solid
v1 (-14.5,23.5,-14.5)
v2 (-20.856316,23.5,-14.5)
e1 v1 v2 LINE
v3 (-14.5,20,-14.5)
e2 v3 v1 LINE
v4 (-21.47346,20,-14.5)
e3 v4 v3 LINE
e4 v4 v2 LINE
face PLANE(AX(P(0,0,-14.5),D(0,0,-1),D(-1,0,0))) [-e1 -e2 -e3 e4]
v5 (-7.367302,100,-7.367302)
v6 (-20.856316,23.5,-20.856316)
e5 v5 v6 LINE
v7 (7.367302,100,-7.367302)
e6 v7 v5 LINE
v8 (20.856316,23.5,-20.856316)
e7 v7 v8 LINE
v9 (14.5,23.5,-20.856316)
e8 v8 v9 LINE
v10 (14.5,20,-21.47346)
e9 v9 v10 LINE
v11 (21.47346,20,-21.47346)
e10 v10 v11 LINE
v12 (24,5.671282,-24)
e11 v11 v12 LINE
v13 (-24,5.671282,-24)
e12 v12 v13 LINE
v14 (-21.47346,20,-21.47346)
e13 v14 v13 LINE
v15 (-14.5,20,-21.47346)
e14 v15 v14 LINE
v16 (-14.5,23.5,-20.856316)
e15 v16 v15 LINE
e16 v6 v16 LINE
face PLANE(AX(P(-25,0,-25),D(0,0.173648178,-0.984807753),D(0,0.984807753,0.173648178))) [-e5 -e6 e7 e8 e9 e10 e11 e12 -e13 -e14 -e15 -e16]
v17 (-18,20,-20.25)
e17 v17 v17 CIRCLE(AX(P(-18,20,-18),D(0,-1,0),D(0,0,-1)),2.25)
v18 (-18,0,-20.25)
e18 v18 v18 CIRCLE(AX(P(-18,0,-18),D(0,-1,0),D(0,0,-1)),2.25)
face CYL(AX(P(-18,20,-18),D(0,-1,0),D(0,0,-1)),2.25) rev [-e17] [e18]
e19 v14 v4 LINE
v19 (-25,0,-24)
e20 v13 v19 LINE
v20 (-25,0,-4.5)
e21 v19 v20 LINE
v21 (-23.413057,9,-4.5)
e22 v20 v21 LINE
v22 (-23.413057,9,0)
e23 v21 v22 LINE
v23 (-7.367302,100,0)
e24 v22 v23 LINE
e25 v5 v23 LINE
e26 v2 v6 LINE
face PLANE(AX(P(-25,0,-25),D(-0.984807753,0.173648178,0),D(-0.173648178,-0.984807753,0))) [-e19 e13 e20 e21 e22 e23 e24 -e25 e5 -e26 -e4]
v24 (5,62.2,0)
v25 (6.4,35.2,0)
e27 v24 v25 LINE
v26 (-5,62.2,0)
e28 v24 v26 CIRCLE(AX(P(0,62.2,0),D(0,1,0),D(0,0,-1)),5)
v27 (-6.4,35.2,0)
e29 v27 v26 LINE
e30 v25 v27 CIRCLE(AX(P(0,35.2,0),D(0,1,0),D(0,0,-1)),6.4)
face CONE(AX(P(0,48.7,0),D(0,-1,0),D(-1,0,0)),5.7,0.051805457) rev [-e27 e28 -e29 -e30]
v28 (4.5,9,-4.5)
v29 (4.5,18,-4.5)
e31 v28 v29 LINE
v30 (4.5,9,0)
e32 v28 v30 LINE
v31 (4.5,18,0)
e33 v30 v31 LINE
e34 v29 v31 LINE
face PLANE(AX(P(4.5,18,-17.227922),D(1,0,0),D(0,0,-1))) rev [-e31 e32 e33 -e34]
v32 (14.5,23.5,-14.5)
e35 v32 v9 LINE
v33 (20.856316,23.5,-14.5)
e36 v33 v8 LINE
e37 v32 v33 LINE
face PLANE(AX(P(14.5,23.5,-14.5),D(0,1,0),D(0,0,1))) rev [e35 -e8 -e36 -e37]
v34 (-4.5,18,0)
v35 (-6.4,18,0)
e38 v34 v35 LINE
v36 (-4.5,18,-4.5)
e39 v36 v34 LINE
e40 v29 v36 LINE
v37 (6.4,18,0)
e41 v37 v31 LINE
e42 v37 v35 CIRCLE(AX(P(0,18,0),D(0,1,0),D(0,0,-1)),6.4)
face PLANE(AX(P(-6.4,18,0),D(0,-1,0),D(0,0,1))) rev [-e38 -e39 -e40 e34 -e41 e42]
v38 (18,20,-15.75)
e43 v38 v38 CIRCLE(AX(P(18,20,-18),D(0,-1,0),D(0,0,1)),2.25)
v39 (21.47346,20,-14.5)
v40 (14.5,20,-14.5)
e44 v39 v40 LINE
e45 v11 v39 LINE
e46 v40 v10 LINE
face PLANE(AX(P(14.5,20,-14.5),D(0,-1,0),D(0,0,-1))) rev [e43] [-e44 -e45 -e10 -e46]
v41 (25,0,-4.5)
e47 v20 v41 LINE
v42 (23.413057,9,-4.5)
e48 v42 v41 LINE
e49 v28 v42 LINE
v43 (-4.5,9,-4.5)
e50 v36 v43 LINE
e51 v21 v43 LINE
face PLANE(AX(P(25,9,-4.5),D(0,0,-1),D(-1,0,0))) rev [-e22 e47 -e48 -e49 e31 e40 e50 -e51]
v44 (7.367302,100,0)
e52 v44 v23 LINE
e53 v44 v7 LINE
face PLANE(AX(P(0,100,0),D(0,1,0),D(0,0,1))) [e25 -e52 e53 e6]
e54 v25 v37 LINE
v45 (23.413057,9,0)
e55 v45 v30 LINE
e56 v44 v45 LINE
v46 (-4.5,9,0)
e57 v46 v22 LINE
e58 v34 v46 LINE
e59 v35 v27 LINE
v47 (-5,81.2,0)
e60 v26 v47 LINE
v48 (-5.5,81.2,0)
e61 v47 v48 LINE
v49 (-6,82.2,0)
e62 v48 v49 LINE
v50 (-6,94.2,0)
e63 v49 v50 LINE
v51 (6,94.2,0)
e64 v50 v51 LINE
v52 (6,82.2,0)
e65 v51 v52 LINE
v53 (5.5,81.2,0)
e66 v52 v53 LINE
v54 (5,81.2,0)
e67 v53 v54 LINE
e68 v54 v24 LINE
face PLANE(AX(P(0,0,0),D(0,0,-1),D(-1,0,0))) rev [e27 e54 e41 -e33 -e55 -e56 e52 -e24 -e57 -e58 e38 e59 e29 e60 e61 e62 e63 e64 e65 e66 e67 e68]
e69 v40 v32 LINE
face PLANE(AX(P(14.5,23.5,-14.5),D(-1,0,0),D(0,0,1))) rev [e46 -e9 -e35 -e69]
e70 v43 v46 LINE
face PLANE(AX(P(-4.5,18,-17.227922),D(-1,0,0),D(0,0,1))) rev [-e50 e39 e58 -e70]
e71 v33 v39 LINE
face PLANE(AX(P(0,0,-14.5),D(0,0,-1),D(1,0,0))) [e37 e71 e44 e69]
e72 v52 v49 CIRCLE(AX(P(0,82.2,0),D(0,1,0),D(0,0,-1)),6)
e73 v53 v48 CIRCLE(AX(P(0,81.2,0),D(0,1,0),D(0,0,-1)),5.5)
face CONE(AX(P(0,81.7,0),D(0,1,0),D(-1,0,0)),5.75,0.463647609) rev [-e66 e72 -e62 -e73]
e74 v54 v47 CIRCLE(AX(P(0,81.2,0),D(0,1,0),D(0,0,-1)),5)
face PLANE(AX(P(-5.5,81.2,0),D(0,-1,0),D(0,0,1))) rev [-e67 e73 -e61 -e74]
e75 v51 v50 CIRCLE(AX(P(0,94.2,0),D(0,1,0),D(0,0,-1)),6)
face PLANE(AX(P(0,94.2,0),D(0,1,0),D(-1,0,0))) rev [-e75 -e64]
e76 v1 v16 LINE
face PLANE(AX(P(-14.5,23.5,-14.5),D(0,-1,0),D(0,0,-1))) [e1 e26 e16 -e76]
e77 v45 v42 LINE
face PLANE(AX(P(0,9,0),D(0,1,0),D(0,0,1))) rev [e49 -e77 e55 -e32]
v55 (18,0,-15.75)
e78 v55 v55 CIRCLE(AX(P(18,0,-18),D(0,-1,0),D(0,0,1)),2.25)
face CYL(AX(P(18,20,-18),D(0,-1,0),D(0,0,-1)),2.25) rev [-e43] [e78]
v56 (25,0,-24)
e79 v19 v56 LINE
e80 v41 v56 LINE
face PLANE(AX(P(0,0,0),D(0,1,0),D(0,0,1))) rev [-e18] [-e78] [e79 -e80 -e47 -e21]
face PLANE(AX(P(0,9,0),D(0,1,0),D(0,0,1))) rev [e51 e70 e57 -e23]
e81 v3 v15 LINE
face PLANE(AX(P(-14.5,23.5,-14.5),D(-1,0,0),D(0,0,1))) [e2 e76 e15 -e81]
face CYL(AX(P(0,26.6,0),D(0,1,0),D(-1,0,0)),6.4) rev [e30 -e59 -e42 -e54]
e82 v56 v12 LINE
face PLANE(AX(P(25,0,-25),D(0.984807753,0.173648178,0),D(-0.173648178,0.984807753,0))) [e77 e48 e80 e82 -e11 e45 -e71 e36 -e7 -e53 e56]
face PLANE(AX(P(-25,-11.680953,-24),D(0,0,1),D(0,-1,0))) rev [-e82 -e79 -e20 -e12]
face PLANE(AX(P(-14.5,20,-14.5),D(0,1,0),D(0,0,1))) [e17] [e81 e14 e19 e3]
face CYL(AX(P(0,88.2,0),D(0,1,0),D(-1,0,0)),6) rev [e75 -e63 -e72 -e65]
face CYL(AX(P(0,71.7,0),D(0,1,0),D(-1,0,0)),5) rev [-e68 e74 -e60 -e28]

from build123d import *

# Parameters (mm, degrees)
SKETCH_2_W               = 50
SKETCH_2_H               = 50
EXTRUDE_1_DEPTH          = 100
EXTRUDE_1_TAPER          = 10
SKETCH_3_W               = 215.720321278
SKETCH_3_H               = 290.879799434
CUT_EXTRUDE_1_DEPTH      = 107.066017319
SKETCH_7_W               = 4.5
SKETCH_7_H               = 23.792731937
SKETCH_8_W               = 50
SKETCH_8_H               = 4.5
CUT_EXTRUDE_2_DEPTH      = 9
SKETCH_9_W               = 9
SKETCH_9_H               = 9
CUT_EXTRUDE_3_DEPTH      = 4.5
SKETCH_10_W              = 7
SKETCH_10_H              = 3.5
CUT_EXTRUDE_4_DEPTH      = 10.5
SKETCH_11_R              = 2.25
CUT_EXTRUDE_5_DEPTH      = 20
CUT_EXTRUDE_6_DEPTH      = 107.066017319
CUT_EXTRUDE_6_DEPTH_BACK = 107.066017319
SKETCH_12_W              = 75.055418853
SKETCH_12_H              = 23.361905794


with BuildPart() as part:
    # 草圖2 → 填料-伸長1 (new body)
    with BuildSketch(Plane(origin=(0, 0, 0), x_dir=(1, 0, 0), z_dir=(0, 1, 0))):
        Rectangle(SKETCH_2_W, SKETCH_2_H)
    extrude(amount=EXTRUDE_1_DEPTH, taper=EXTRUDE_1_TAPER)

    # 草圖3 → 除料-伸長1 (cut, through all)
    with BuildSketch(Plane.XY):
        Rectangle(SKETCH_3_W, SKETCH_3_H)
    extrude(amount=CUT_EXTRUDE_1_DEPTH, mode=Mode.SUBTRACT)


with BuildPart() as body_2:
    # stick_antenna_434MHz: read off the stored shape, not the designer's step
    # stick_antenna_434MHz outline → stick_antenna_434MHz (revolve)
    with BuildSketch(Plane.XY):
        Polygon((0, 94.2), (0, 23), (3, 23), (3, 18), (6.4, 18), (6.4, 35.2), (5, 62.2), (5, 81.2), (5.5, 81.2), (6, 82.2), (6, 94.2), align=None)
    revolve(axis=Axis((0, 0, 0), (0, 1, 0)))


with BuildPart() as part_1:
    add(part.part)

    # Other 1: read off the stored shape, not the designer's step
    # Other 1: cut body 2
    add(body_2.part, mode=Mode.SUBTRACT)

    # 草圖7 → 除料-旋轉1 (revolve, cut)
    with BuildSketch(Plane.XY):
        with Locations((2.25, 11.896365969)):
            Rectangle(SKETCH_7_W, SKETCH_7_H)
    revolve(axis=Axis((0, 30.263839144, 0), (0, -1, 0)), mode=Mode.SUBTRACT)

    # 草圖8 → 除料-伸長2 (cut)
    with BuildSketch(Plane.XZ):
        with Locations((0, -2.25)):
            Rectangle(SKETCH_8_W, SKETCH_8_H)
    extrude(amount=-CUT_EXTRUDE_2_DEPTH, mode=Mode.SUBTRACT)

    # 草圖9 → 除料-伸長3 (cut)
    with BuildSketch(Plane.XY):
        with Locations((0, 13.5)):
            Rectangle(SKETCH_9_W, SKETCH_9_H)
    extrude(amount=-CUT_EXTRUDE_3_DEPTH, mode=Mode.SUBTRACT)

    # 草圖10 → 除料-伸長4 (cut)
    with BuildSketch(Plane.XY.offset(-25)):
        with Locations((-18, 21.75)):
            Rectangle(SKETCH_10_W, SKETCH_10_H)
    cut_extrude_4 = extrude(amount=CUT_EXTRUDE_4_DEPTH, mode=Mode.SUBTRACT)

    # 草圖11 → 除料-伸長5 (cut)
    with BuildSketch(Plane.XZ):
        with Locations(Location((-18, -18, 0), (0, 0, 270))):
            Circle(SKETCH_11_R)
        with Locations(Location((18, -18, 0), (0, 0, 90))):
            Circle(SKETCH_11_R)
    extrude(amount=-CUT_EXTRUDE_5_DEPTH, mode=Mode.SUBTRACT)

    # 鏡射2: 除料-伸長4 across plane
    add(cut_extrude_4.mirror(Plane(origin=(0, 0, 0), x_dir=(0, 0, 1), z_dir=(1, 0, 0))), mode=Mode.SUBTRACT)

    # 草圖12 → 除料-伸長6 (cut, two sides: drawn at the far end of the back side and taken through both)
    with BuildSketch(Plane(origin=(0, 0, 0), x_dir=(0, 0, -1), z_dir=(1, 0, 0)).offset(-CUT_EXTRUDE_6_DEPTH_BACK)):
        with Locations((61.527709427, 0)):
            Rectangle(SKETCH_12_W, SKETCH_12_H)
    extrude(amount=CUT_EXTRUDE_6_DEPTH + CUT_EXTRUDE_6_DEPTH_BACK, mode=Mode.SUBTRACT)


solid = part_1.part
